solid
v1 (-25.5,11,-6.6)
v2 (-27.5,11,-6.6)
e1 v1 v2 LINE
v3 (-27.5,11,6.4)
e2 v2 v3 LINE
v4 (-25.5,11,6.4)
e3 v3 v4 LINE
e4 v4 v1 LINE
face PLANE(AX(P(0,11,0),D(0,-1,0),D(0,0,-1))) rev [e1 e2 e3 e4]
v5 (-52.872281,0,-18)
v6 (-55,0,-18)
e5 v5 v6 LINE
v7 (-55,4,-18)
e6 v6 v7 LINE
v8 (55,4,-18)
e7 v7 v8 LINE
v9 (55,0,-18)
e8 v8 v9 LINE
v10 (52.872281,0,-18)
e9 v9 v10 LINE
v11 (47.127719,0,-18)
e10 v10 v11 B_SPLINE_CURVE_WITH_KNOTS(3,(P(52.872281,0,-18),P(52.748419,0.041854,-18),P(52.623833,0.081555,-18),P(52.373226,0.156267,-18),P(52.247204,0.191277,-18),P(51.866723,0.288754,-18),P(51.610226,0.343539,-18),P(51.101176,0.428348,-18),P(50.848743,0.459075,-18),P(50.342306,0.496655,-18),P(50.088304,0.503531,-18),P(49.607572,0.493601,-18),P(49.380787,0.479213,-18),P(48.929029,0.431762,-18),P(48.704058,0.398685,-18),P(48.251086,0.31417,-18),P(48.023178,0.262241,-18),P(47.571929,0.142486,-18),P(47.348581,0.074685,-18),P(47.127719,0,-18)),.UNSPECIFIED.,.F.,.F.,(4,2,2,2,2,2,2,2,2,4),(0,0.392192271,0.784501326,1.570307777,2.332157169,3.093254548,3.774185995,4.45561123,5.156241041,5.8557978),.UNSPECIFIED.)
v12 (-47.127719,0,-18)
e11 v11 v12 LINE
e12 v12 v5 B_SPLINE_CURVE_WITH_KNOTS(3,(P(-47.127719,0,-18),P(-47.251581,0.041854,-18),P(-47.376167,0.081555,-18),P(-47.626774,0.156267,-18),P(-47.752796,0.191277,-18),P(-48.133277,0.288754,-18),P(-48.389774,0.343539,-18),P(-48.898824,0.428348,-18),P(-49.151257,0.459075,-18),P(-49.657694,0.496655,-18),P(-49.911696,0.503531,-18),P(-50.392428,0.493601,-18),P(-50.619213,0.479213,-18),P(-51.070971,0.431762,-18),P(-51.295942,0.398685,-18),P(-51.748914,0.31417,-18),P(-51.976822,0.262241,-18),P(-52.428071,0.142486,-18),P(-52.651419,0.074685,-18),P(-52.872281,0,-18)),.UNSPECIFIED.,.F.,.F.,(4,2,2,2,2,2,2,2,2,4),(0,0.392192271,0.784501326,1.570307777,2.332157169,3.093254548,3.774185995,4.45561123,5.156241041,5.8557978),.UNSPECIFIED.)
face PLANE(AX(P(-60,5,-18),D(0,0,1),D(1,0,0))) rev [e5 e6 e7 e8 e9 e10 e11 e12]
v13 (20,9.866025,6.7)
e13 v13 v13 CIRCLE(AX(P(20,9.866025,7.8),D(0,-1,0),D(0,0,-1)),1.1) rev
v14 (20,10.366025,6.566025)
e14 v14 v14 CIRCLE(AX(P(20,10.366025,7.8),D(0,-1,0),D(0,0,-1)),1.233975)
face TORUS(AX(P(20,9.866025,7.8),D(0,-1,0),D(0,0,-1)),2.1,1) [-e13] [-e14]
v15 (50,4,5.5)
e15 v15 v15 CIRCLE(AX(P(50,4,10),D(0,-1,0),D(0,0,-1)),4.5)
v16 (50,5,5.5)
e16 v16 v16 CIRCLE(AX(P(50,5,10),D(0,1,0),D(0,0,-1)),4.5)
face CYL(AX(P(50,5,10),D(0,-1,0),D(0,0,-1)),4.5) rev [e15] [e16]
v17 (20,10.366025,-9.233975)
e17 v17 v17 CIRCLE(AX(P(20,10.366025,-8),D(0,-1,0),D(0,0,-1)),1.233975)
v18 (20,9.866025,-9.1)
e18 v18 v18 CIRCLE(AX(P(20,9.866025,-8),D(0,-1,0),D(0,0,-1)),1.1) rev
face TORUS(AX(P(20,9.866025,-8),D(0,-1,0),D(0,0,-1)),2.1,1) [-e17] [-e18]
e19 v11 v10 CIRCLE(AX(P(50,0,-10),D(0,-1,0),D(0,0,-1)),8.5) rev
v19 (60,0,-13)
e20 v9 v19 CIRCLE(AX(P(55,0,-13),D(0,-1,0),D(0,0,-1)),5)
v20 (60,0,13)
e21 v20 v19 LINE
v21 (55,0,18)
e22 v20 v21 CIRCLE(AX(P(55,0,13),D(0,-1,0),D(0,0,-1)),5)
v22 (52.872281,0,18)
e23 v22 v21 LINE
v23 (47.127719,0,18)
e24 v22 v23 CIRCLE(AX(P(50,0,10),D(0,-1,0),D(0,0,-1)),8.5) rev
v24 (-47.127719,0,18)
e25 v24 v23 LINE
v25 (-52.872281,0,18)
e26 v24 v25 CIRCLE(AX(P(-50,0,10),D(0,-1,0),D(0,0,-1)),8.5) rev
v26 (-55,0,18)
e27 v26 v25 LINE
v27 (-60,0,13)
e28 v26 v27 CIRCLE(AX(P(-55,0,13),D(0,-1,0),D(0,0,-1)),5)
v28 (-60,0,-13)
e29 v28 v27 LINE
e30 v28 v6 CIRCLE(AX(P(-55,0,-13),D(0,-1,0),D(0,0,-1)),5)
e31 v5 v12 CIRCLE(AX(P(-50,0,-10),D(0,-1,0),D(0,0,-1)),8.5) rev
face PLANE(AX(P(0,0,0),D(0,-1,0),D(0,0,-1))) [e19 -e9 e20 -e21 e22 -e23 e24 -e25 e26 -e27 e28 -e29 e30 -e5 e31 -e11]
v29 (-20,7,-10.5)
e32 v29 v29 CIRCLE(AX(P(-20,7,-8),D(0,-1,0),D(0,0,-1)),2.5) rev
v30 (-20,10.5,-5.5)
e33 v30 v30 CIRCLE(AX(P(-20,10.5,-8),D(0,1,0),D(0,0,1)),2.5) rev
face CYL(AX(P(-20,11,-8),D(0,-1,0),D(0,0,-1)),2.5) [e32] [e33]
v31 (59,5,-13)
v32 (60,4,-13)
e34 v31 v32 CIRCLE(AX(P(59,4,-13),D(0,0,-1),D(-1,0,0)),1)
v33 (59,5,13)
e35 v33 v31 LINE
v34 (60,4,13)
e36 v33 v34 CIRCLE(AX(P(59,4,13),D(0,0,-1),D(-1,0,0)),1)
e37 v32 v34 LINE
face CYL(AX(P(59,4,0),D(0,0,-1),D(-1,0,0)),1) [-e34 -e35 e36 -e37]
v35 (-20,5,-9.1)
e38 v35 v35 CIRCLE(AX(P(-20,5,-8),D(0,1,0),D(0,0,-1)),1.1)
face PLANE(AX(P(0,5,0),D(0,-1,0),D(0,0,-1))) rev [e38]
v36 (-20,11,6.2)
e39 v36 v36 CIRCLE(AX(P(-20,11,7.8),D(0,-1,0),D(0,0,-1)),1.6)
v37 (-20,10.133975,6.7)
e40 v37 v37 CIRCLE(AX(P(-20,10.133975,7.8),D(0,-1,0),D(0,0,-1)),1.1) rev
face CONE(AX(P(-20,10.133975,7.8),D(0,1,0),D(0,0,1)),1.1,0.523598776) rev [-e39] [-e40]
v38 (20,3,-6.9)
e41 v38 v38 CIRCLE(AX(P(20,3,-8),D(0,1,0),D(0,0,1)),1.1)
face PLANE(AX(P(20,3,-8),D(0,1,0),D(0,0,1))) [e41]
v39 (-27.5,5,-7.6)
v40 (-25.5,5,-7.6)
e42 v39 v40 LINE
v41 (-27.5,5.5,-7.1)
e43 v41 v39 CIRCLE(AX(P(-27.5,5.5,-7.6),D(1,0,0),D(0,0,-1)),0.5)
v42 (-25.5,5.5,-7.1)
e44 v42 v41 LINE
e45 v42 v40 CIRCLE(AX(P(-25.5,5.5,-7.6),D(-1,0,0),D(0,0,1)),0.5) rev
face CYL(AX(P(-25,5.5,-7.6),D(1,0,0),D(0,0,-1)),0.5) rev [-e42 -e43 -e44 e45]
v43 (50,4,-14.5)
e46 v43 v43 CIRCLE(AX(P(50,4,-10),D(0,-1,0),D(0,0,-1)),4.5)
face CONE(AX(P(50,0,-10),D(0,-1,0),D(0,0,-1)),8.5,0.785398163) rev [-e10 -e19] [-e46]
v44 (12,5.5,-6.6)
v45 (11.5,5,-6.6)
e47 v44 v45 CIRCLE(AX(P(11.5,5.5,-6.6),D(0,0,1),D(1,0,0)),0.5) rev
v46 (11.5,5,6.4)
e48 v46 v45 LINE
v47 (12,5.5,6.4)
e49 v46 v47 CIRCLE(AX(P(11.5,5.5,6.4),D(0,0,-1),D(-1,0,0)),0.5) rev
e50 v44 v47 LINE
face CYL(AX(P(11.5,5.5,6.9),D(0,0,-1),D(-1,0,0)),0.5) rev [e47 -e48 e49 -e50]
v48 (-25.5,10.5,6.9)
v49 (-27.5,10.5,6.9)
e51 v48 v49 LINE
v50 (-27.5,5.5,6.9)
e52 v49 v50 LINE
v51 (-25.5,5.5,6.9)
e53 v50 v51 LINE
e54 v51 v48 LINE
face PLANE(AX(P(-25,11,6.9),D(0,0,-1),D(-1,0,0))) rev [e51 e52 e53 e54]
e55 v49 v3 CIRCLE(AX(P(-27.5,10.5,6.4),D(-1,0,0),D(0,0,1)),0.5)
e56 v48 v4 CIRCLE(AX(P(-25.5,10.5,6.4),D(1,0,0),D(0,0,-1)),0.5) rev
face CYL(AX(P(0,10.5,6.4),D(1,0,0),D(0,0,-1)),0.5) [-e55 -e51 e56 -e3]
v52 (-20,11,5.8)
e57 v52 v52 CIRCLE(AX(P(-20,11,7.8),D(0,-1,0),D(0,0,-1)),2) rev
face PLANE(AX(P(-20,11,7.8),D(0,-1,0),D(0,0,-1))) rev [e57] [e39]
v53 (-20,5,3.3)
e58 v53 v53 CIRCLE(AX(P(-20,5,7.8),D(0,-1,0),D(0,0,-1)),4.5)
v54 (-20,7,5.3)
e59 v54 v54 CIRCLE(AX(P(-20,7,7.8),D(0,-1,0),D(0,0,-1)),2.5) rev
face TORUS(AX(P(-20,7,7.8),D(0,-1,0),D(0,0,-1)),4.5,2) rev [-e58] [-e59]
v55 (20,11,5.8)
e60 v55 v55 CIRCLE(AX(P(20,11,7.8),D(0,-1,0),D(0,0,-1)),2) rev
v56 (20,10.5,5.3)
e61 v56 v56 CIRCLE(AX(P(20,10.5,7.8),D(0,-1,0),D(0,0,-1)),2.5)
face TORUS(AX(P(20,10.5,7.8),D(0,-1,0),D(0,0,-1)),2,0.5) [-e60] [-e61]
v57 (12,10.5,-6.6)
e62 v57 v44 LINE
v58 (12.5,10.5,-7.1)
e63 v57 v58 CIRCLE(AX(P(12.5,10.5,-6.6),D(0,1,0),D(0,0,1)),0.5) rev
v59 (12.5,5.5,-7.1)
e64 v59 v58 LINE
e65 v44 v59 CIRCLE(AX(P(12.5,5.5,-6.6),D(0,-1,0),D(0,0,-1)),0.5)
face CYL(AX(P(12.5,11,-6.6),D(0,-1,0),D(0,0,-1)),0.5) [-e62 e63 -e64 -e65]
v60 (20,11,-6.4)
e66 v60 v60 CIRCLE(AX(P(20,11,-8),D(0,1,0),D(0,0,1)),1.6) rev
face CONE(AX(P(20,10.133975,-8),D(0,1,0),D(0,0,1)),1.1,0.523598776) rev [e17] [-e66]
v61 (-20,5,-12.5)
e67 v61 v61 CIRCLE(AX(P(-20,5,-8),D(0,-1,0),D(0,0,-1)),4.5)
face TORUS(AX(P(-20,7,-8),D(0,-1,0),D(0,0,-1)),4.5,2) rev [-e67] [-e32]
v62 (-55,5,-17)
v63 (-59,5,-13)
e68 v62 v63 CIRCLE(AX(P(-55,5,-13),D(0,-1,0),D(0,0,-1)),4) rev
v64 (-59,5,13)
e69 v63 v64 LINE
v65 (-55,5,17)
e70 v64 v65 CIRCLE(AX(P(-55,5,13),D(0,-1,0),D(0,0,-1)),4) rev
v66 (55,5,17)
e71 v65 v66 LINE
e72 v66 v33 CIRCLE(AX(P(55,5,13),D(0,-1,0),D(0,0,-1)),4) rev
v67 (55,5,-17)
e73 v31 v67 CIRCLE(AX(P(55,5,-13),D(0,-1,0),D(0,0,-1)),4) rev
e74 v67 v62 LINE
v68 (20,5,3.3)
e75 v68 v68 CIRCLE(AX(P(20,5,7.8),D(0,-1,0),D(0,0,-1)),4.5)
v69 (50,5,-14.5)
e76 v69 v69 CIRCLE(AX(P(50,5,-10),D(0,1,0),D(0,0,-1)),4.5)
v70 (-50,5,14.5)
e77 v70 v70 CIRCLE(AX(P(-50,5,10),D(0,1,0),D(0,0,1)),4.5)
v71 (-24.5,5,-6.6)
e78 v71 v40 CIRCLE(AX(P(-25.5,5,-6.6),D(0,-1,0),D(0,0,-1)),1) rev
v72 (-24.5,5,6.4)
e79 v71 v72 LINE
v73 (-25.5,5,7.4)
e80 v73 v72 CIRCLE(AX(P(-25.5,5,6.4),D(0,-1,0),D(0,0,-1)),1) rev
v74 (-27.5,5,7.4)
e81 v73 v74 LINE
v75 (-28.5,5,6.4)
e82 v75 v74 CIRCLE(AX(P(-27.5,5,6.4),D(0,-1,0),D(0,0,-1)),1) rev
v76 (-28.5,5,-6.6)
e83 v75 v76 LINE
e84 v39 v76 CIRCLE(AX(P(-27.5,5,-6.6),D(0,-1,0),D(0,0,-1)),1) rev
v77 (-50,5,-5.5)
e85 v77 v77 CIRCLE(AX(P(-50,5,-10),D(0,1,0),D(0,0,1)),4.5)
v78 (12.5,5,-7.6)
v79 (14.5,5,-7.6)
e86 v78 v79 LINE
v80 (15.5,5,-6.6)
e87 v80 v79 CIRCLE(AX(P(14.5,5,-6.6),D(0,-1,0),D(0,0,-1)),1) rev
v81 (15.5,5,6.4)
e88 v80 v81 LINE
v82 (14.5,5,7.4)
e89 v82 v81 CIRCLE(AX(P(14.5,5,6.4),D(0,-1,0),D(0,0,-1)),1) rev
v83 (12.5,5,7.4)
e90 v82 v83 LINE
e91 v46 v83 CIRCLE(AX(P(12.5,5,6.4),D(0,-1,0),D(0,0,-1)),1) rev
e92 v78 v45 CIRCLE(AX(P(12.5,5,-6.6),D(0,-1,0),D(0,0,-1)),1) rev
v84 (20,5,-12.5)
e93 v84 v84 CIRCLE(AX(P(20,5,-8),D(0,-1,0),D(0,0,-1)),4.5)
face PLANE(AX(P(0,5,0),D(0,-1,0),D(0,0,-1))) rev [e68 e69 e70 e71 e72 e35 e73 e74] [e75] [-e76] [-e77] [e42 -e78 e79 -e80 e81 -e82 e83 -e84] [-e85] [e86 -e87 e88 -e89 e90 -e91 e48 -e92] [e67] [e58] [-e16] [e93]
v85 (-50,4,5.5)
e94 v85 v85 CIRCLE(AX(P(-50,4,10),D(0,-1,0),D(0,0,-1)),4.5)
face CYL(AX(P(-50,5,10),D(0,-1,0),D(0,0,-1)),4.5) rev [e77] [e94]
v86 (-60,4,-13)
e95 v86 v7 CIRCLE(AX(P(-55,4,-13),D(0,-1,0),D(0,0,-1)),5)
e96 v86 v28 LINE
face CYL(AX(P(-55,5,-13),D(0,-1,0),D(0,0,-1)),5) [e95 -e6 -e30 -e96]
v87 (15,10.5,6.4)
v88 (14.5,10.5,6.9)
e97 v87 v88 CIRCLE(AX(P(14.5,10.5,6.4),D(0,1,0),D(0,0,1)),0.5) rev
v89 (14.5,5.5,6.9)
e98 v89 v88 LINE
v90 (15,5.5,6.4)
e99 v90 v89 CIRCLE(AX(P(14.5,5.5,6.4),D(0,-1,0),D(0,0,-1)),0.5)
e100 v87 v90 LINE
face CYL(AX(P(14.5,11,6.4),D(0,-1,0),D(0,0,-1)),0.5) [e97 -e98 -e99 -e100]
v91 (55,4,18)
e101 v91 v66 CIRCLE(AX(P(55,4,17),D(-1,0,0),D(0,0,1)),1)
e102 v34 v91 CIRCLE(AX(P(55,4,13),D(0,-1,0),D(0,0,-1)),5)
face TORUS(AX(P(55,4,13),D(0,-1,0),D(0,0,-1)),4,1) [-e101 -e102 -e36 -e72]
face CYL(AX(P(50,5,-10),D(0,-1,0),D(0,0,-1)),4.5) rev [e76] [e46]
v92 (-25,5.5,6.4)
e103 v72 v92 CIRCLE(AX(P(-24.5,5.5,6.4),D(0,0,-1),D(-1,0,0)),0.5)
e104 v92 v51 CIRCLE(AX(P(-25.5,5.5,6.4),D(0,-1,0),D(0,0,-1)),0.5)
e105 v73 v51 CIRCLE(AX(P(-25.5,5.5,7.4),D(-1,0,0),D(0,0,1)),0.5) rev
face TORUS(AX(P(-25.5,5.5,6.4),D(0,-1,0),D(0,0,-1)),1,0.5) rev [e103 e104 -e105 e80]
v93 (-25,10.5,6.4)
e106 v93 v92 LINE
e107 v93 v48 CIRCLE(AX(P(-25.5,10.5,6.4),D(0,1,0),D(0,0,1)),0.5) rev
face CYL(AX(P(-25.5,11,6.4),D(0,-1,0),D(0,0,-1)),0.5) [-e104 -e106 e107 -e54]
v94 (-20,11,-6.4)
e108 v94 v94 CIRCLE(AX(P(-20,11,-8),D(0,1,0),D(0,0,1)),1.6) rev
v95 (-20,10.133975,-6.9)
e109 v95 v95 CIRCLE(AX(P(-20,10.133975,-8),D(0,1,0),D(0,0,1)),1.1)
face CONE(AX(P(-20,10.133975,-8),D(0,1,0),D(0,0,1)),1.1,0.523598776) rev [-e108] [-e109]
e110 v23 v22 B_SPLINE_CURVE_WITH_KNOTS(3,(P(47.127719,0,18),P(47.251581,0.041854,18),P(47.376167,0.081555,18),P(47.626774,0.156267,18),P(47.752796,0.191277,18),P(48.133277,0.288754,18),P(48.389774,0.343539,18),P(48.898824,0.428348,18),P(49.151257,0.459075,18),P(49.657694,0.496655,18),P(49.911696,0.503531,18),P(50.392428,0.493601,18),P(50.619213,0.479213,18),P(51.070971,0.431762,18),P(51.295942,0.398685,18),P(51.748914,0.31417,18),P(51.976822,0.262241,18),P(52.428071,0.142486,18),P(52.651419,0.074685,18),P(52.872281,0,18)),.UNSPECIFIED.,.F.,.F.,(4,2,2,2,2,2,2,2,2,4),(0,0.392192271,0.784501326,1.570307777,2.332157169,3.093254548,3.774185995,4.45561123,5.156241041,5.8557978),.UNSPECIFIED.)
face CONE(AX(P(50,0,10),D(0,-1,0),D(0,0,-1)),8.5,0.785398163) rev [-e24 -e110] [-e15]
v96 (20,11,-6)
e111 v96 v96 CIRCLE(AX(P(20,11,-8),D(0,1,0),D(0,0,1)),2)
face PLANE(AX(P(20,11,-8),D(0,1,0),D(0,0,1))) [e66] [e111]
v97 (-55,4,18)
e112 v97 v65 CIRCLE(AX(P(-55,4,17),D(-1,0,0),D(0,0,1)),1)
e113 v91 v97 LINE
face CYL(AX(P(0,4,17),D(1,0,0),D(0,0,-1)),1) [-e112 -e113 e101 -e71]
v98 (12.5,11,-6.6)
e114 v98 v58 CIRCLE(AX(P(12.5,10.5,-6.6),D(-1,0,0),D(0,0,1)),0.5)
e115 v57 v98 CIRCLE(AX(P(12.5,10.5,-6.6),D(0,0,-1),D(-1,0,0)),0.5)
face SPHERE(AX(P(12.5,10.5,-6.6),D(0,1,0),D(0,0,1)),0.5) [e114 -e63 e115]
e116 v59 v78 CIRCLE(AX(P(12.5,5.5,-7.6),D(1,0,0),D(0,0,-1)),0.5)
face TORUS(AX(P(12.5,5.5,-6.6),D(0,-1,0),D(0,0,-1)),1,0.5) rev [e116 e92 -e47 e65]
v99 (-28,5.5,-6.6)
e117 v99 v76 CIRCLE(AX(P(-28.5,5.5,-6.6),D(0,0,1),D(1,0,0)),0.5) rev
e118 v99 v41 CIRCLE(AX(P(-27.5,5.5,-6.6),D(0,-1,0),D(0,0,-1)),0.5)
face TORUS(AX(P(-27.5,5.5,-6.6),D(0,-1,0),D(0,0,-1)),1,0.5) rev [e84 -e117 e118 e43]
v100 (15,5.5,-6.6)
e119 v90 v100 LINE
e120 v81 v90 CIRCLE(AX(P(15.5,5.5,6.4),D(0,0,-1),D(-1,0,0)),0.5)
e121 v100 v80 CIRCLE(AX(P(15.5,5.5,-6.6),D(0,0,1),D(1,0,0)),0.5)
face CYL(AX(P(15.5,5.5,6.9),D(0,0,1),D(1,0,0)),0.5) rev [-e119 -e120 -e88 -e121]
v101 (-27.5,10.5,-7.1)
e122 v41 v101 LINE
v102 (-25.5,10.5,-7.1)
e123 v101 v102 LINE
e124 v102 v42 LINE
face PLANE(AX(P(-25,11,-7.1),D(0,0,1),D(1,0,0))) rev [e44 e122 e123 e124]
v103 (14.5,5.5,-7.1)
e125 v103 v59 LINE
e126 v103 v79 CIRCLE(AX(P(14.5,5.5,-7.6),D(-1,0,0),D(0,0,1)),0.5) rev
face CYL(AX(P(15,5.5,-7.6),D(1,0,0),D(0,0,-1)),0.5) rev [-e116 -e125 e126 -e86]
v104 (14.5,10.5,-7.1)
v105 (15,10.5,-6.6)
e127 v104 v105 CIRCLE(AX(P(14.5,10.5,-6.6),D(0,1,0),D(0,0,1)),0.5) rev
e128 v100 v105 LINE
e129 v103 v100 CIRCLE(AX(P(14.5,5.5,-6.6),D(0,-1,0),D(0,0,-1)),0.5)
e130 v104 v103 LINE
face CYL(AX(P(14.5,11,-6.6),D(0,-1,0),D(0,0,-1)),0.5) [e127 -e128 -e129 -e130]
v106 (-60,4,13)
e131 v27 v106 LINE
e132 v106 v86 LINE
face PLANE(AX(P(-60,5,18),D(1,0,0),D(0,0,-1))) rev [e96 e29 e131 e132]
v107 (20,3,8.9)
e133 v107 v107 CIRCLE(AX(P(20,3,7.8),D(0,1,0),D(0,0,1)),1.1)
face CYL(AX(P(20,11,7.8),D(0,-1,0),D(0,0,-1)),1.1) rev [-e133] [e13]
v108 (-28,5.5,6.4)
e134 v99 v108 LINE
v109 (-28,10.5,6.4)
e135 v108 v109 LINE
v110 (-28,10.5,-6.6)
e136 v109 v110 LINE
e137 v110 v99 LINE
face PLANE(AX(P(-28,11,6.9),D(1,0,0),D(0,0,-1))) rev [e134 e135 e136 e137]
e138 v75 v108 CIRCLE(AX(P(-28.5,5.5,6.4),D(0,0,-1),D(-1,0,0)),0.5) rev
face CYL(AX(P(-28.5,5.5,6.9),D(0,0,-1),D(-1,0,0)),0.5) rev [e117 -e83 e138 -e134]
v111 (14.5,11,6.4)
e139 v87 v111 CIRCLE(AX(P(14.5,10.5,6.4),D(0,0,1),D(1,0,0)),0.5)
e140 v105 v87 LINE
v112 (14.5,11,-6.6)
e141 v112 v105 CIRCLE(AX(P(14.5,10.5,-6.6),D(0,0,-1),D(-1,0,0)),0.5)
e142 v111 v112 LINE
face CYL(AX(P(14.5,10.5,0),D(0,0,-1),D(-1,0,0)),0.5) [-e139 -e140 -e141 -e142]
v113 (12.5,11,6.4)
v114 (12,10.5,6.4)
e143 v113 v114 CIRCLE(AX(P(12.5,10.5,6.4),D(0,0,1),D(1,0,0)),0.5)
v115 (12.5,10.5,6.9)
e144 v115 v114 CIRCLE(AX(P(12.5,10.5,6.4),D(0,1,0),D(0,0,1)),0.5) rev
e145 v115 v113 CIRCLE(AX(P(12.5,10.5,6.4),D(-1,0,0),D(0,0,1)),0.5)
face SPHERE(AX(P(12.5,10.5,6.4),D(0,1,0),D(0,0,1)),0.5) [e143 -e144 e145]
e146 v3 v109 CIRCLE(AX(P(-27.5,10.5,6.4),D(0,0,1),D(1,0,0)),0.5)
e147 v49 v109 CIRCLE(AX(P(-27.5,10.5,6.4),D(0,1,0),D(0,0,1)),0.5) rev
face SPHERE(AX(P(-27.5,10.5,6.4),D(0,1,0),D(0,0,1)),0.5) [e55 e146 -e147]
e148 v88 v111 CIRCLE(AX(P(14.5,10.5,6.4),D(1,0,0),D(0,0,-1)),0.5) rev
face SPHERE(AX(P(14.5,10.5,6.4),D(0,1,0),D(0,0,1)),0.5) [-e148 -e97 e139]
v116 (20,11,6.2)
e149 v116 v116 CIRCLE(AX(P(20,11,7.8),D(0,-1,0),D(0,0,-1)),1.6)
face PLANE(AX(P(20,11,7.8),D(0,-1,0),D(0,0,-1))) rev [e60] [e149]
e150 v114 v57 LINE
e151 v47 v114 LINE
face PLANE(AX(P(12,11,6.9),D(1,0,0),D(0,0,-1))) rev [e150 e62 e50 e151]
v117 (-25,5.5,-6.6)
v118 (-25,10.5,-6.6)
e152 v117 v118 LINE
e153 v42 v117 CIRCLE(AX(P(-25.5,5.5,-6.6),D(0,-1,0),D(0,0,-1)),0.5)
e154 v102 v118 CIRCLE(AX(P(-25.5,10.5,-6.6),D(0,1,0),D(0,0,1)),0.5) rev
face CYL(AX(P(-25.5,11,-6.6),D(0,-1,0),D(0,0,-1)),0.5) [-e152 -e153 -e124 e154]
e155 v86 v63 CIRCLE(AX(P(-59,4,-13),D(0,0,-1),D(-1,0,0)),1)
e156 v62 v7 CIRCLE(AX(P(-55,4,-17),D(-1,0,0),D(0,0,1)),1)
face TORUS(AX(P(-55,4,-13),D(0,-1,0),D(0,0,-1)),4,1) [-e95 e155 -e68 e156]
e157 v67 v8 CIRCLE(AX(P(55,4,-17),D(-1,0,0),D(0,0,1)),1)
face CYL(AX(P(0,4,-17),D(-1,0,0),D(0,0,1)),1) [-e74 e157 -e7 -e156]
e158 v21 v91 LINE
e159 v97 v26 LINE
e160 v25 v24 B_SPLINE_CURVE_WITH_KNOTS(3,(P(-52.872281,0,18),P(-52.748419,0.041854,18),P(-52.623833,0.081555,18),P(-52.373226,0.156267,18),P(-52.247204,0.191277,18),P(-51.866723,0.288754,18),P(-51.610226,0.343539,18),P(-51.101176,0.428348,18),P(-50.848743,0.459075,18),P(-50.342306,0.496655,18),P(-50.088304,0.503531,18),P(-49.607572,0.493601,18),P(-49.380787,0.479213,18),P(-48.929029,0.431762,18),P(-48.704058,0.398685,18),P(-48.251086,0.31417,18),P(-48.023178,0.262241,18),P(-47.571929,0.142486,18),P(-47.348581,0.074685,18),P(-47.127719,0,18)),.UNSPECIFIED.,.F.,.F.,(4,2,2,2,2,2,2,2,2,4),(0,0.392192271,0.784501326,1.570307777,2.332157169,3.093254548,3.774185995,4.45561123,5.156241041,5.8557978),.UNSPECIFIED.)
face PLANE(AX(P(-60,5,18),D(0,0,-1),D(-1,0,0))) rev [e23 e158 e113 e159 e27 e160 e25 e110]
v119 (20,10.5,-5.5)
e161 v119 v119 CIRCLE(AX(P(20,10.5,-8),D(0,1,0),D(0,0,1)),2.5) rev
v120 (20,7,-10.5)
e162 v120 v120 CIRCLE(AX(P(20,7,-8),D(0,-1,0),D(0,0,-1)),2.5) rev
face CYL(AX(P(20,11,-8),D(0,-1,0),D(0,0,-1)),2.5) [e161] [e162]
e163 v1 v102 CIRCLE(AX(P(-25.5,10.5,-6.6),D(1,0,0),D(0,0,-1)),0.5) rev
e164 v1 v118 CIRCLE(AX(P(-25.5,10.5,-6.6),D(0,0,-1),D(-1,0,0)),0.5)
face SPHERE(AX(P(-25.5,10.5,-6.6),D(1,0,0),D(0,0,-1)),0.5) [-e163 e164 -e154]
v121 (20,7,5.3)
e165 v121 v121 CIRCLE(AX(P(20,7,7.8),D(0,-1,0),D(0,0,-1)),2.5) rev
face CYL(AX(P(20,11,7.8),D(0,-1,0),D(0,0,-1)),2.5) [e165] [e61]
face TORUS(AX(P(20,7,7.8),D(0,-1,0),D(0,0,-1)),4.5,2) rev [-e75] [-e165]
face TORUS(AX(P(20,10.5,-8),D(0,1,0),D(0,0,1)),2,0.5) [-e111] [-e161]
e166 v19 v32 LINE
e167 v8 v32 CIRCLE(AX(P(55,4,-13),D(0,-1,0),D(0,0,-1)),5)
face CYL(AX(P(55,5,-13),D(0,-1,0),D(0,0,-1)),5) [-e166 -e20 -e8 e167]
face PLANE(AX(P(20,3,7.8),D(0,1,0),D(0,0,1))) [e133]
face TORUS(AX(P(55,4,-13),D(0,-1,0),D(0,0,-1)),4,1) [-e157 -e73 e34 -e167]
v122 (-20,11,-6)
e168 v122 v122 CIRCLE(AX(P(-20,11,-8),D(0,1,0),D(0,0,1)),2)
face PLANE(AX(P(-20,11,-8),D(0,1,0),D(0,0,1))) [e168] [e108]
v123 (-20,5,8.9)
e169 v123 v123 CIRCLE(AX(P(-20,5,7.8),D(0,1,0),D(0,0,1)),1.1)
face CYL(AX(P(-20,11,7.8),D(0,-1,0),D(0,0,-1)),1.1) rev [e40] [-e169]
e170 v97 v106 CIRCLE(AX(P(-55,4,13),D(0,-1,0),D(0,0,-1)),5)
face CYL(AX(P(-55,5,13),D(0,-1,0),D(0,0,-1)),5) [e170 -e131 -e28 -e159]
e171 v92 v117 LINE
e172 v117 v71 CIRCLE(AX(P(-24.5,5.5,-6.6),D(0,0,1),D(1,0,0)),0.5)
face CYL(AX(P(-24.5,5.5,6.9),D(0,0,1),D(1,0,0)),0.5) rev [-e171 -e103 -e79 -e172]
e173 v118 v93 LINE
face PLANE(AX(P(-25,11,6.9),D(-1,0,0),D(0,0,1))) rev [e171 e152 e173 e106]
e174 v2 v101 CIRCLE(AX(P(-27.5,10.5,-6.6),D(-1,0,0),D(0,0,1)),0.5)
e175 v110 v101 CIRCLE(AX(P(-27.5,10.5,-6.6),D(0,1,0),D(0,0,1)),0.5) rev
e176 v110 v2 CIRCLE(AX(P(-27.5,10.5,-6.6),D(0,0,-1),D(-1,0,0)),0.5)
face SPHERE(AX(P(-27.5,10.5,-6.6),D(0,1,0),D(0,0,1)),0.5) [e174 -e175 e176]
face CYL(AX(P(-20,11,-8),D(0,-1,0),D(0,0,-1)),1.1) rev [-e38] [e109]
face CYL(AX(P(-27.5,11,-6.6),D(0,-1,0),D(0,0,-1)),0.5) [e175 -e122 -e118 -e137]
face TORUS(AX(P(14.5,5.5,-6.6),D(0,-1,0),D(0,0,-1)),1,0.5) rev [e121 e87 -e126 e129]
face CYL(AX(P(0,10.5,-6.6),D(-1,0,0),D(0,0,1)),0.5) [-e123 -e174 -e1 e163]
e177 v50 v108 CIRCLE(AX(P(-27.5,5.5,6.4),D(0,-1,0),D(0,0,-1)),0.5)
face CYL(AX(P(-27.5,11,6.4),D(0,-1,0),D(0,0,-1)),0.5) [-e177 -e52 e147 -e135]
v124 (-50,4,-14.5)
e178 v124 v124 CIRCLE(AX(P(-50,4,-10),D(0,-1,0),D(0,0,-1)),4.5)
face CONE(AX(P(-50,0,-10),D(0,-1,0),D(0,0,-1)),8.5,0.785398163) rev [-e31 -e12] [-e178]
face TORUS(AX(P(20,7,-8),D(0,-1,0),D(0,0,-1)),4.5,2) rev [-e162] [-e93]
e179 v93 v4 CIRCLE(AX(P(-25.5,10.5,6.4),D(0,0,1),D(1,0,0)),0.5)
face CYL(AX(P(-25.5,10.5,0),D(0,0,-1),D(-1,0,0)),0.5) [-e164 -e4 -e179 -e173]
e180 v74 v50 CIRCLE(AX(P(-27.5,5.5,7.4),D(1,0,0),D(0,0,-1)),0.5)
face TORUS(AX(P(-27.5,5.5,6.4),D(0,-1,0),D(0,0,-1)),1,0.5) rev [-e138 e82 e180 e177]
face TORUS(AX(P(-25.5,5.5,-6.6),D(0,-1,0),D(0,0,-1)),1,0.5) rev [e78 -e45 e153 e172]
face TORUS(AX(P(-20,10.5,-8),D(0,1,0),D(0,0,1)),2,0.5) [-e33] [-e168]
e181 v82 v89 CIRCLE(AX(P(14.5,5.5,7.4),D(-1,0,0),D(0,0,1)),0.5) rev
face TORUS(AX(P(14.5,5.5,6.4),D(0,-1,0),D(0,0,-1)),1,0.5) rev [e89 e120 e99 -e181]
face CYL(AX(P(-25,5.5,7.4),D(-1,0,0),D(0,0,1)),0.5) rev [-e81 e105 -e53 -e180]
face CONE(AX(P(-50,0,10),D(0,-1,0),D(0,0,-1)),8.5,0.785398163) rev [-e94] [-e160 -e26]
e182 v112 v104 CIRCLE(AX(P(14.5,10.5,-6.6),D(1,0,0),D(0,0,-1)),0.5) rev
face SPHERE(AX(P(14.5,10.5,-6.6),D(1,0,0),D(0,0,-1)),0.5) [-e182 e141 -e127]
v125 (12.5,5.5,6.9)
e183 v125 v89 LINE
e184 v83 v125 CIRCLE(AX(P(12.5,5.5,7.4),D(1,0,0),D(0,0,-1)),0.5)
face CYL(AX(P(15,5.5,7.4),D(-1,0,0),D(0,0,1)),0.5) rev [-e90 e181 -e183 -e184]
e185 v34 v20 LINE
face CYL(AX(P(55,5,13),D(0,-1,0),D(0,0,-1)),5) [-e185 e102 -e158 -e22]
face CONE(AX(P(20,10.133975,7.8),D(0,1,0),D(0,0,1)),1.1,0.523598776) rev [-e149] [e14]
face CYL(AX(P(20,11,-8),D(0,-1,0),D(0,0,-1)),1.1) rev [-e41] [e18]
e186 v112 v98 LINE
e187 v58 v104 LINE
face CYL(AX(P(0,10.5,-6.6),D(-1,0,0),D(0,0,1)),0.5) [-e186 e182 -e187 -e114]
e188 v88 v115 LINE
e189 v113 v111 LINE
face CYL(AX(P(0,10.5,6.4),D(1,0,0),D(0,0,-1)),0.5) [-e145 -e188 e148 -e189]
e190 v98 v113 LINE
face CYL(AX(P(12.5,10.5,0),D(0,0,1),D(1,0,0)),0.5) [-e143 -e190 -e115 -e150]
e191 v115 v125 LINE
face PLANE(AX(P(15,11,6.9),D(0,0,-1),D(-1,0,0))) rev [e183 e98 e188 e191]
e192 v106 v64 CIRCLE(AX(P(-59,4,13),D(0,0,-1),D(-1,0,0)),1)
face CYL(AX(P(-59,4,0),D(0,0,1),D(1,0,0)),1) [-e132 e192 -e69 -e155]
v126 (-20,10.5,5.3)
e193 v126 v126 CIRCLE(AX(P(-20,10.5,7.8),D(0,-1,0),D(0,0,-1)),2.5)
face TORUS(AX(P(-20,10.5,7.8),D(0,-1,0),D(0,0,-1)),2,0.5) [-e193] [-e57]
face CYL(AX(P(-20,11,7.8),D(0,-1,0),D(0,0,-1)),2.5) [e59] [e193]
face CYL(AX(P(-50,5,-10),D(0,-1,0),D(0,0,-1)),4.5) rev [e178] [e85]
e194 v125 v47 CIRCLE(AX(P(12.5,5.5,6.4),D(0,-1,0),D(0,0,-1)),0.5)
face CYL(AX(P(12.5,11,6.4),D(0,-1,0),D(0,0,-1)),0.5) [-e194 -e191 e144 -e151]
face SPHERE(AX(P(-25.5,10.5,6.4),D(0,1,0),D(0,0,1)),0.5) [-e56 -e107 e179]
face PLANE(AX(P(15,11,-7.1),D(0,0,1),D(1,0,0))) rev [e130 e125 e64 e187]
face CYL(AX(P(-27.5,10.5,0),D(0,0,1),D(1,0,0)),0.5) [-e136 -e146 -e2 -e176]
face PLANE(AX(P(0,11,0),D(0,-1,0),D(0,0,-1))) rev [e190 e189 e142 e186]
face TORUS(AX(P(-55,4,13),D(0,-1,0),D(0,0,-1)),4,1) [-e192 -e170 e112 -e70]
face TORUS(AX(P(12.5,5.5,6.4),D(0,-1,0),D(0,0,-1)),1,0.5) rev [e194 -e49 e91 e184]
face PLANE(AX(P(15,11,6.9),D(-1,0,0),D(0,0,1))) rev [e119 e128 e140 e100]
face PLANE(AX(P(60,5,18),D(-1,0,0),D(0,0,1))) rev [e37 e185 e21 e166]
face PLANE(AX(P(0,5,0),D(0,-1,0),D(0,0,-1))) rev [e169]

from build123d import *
from OCP.BRepFilletAPI import BRepFilletAPI_MakeChamfer

# Parameters (mm, degrees)
SKETCH_1_W          = 120
SKETCH_1_H          = 36
SKETCH_1_R          = 4.5
EXTRUDE_1_DEPTH     = 5
FILLET_1_R          = 5
SKETCH_2_R          = 2.5
SKETCH_2_R_2        = 1.1
SKETCH_2_W          = 3
SKETCH_2_H          = 14
EXTRUDE_2_DEPTH     = 6
CUT_EXTRUDE_START   = -8
SKETCH_3_R          = 1.1
CUT_EXTRUDE_1_DEPTH = 8
FILLET_2_R          = 2
FILLET_3_R          = 0.5
FILLET_4_R          = 1
CHAMFER_1_SIZE      = 4
CHAMFER_3_SIZE      = 0.5
CHAMFER_3_SIZE2     = 0.866025404
FILLET_5_R          = 1


with BuildPart() as part:
    # Эскиз1 → Бобышка-Вытянуть1 (new body)
    with BuildSketch(Plane(origin=(0, 0, 0), x_dir=(1, 0, 0), z_dir=(0, 1, 0))):
        Rectangle(SKETCH_1_W, SKETCH_1_H)
        with Locations(Location((-50, -10, 0), (0, 0, 270))):
            Circle(SKETCH_1_R, mode=Mode.SUBTRACT)
        with Locations(Location((50, -10, 0), (0, 0, 90))):
            Circle(SKETCH_1_R, mode=Mode.SUBTRACT)
        with Locations(Location((50, 10, 0), (0, 0, 90))):
            Circle(SKETCH_1_R, mode=Mode.SUBTRACT)
        with Locations(Location((-50, 10, 0), (0, 0, 270))):
            Circle(SKETCH_1_R, mode=Mode.SUBTRACT)
    extrude(amount=EXTRUDE_1_DEPTH)

    # Скругление1
    fillet_1_edges = [part.edges().sort_by_distance(p)[0] for p in [
        (60, 2.5, 18),
        (-60, 2.5, 18),
        (-60, 2.5, -18),
        (60, 2.5, -18),
    ]]
    fillet(fillet_1_edges, radius=FILLET_1_R)

    # Эскиз2 → Бобышка-Вытянуть2 (add)
    # profile 1 of 6: a face of its own
    with BuildSketch(Plane(origin=(0, 5, 0), x_dir=(1, 0, 0), z_dir=(0, 1, 0))):
        with Locations(Location((20, 8, 0), (0, 0, 90))):
            Circle(SKETCH_2_R)
        with Locations(Location((20, 8, 0), (0, 0, 90))):
            Circle(SKETCH_2_R_2, mode=Mode.SUBTRACT)
    # profile 2 of 6: a face of its own
    with BuildSketch(Plane(origin=(0, 5, 0), x_dir=(1, 0, 0), z_dir=(0, 1, 0))):
        with Locations(Location((20, -7.8, 0), (0, 0, 90))):
            Circle(SKETCH_2_R)
        with Locations(Location((20, -7.8, 0), (0, 0, 270))):
            Circle(SKETCH_2_R_2, mode=Mode.SUBTRACT)
    # profile 3 of 6: a face of its own
    with BuildSketch(Plane(origin=(0, 5, 0), x_dir=(1, 0, 0), z_dir=(0, 1, 0))):
        with Locations(Location((-20, 8, 0), (0, 0, 90))):
            Circle(SKETCH_2_R)
        with Locations(Location((-20, 8, 0), (0, 0, 90))):
            Circle(SKETCH_2_R_2, mode=Mode.SUBTRACT)
    # profile 4 of 6: a face of its own
    with BuildSketch(Plane(origin=(0, 5, 0), x_dir=(1, 0, 0), z_dir=(0, 1, 0))):
        with Locations(Location((-20, -7.8, 0), (0, 0, 90))):
            Circle(SKETCH_2_R)
        with Locations(Location((-20, -7.8, 0), (0, 0, 270))):
            Circle(SKETCH_2_R_2, mode=Mode.SUBTRACT)
    # profile 5 of 6: a face of its own
    with BuildSketch(Plane(origin=(0, 5, 0), x_dir=(1, 0, 0), z_dir=(0, 1, 0))):
        with Locations((13.5, 0.1)):
            Rectangle(SKETCH_2_W, SKETCH_2_H)
    # profile 6 of 6: a face of its own
    with BuildSketch(Plane(origin=(0, 5, 0), x_dir=(1, 0, 0), z_dir=(0, 1, 0))):
        with Locations((-26.5, 0.1)):
            Rectangle(SKETCH_2_W, SKETCH_2_H)
    extrude(amount=EXTRUDE_2_DEPTH)

    # Эскиз3 → Cut-Extrude 1 (cut)
    with BuildSketch(Plane(origin=(0, 11, 0), x_dir=(1, 0, 0), z_dir=(0, 1, 0)).offset(CUT_EXTRUDE_START)):
        with Locations(Location((20, -7.8, 0), (0, 0, 270))):
            Circle(SKETCH_3_R)
        with Locations(Location((20, 8, 0), (0, 0, 90))):
            Circle(SKETCH_3_R)
    extrude(amount=CUT_EXTRUDE_1_DEPTH, mode=Mode.SUBTRACT)

    # Скругление2
    fillet_2_edges = [part.edges().sort_by_distance(p)[0] for p in [
        (20, 5, -5.5),
        (20, 5, 10.3),
        (-20, 5, -5.5),
        (-20, 5, 10.3),
    ]]
    fillet(fillet_2_edges, radius=FILLET_2_R)

    # Скругление3
    fillet_3_edges = [part.edges().sort_by_distance(p)[0] for p in [
        (20, 11, -5.5),
        (20, 11, 10.3),
        (13.5, 5, -7.1),
        (15, 8, -7.1),
        (12, 5, -0.1),
        (12, 8, -7.1),
        (13.5, 5, 6.9),
        (12, 8, 6.9),
        (15, 5, -0.1),
        (15, 8, 6.9),
        (13.5, 11, -7.1),
        (12, 11, -0.1),
        (13.5, 11, 6.9),
        (15, 11, -0.1),
        (-20, 11, -5.5),
        (-20, 11, 10.3),
        (-26.5, 5, -7.1),
        (-25, 8, -7.1),
        (-28, 5, -0.1),
        (-28, 8, -7.1),
        (-26.5, 5, 6.9),
        (-28, 8, 6.9),
        (-25, 5, -0.1),
        (-25, 8, 6.9),
        (-26.5, 11, -7.1),
        (-28, 11, -0.1),
        (-26.5, 11, 6.9),
        (-25, 11, -0.1),
    ]]
    fillet(fillet_3_edges, radius=FILLET_3_R)

    # Скругление4
    fillet_4_edges = [part.edges().sort_by_distance(p)[0] for p in [
        (-60, 5, 0),
        (0, 5, -18),
        (60, 5, 0),
        (0, 5, 18),
        (58.535533906, 5, 16.535533906),
        (58.535533906, 5, -16.535533906),
        (-58.535533906, 5, 16.535533906),
        (-58.535533906, 5, -16.535533906),
    ]]
    fillet(fillet_4_edges, radius=FILLET_4_R)

    # Фаска1
    # the kernel refuses this chamfer: 4 mm, written as the material it takes off along each edge
    with BuildSketch(Plane(origin=(-50, 0, 10), x_dir=(0, 0, 1), z_dir=(-1, 0, 0))) as chamfer_1_piece_1:
        Polygon((4.5, CHAMFER_1_SIZE), (4.5 + CHAMFER_1_SIZE, 0), (4.5, 0), align=None)
    revolve(axis=Axis((-50, 0, 10), (0, 1, 0)), mode=Mode.SUBTRACT)
    with BuildSketch(Plane(origin=(50, 0, 10), x_dir=(0, 0, -1), z_dir=(1, 0, 0))) as chamfer_1_piece_2:
        Polygon((4.5, CHAMFER_1_SIZE), (4.5 + CHAMFER_1_SIZE, 0), (4.5, 0), align=None)
    revolve(axis=Axis((50, 0, 10), (0, 1, 0)), mode=Mode.SUBTRACT)
    with BuildSketch(Plane(origin=(50, 0, -10), x_dir=(0, 0, -1), z_dir=(1, 0, 0))) as chamfer_1_piece_3:
        Polygon((4.5, CHAMFER_1_SIZE), (4.5 + CHAMFER_1_SIZE, 0), (4.5, 0), align=None)
    revolve(axis=Axis((50, 0, -10), (0, 1, 0)), mode=Mode.SUBTRACT)
    with BuildSketch(Plane(origin=(-50, 0, -10), x_dir=(0, 0, 1), z_dir=(-1, 0, 0))) as chamfer_1_piece_4:
        Polygon((4.5, CHAMFER_1_SIZE), (4.5 + CHAMFER_1_SIZE, 0), (4.5, 0), align=None)
    revolve(axis=Axis((-50, 0, -10), (0, 1, 0)), mode=Mode.SUBTRACT)

    # Фаска3: one chamfer whose edges measure the first distance from different faces: ONE call of the kernel's chamfer builder (chamfer() names one face for all edges)
    chamfer_3_edges_1 = [part.edges().sort_by_distance(p)[0] for p in [
        (20, 11, -6.9),
    ]]
    chamfer_3_side_1 = [part.faces().sort_by_distance(p)[0] for p in [
        (20, 11, -6.056568542),
    ]]
    chamfer_3_edges_2 = [part.edges().sort_by_distance(p)[0] for p in [
        (20, 11, 6.7),
    ]]
    chamfer_3_side_2 = [part.faces().sort_by_distance(p)[0] for p in [
        (20, 11, 9.743431458),
    ]]
    chamfer_3_edges_3 = [part.edges().sort_by_distance(p)[0] for p in [
        (-20, 11, -6.9),
    ]]
    chamfer_3_side_3 = [part.faces().sort_by_distance(p)[0] for p in [
        (-20, 11, -6.056568542),
    ]]
    chamfer_3_edges_4 = [part.edges().sort_by_distance(p)[0] for p in [
        (-20, 11, 6.7),
    ]]
    chamfer_3_side_4 = [part.faces().sort_by_distance(p)[0] for p in [
        (-20, 11, 9.743431458),
    ]]
    chamfer_3 = BRepFilletAPI_MakeChamfer(part.part.solid().wrapped)
    for e in chamfer_3_edges_1:
        chamfer_3.Add(CHAMFER_3_SIZE, CHAMFER_3_SIZE2, e.wrapped, chamfer_3_side_1[0].wrapped)  # the first distance lies on this face
    for e in chamfer_3_edges_2:
        chamfer_3.Add(CHAMFER_3_SIZE, CHAMFER_3_SIZE2, e.wrapped, chamfer_3_side_2[0].wrapped)  # the first distance lies on this face
    for e in chamfer_3_edges_3:
        chamfer_3.Add(CHAMFER_3_SIZE, CHAMFER_3_SIZE2, e.wrapped, chamfer_3_side_3[0].wrapped)  # the first distance lies on this face
    for e in chamfer_3_edges_4:
        chamfer_3.Add(CHAMFER_3_SIZE, CHAMFER_3_SIZE2, e.wrapped, chamfer_3_side_4[0].wrapped)  # the first distance lies on this face
    add(Compound.cast(chamfer_3.Shape()), mode=Mode.REPLACE)

    # Скругление5
    fillet_5_edges = [part.edges().sort_by_distance(p)[0] for p in [
        (20, 10.133974596, 6.7),
        (20, 10.133974596, -6.9),
    ]]
    fillet(fillet_5_edges, radius=FILLET_5_R)


solid = part.part
